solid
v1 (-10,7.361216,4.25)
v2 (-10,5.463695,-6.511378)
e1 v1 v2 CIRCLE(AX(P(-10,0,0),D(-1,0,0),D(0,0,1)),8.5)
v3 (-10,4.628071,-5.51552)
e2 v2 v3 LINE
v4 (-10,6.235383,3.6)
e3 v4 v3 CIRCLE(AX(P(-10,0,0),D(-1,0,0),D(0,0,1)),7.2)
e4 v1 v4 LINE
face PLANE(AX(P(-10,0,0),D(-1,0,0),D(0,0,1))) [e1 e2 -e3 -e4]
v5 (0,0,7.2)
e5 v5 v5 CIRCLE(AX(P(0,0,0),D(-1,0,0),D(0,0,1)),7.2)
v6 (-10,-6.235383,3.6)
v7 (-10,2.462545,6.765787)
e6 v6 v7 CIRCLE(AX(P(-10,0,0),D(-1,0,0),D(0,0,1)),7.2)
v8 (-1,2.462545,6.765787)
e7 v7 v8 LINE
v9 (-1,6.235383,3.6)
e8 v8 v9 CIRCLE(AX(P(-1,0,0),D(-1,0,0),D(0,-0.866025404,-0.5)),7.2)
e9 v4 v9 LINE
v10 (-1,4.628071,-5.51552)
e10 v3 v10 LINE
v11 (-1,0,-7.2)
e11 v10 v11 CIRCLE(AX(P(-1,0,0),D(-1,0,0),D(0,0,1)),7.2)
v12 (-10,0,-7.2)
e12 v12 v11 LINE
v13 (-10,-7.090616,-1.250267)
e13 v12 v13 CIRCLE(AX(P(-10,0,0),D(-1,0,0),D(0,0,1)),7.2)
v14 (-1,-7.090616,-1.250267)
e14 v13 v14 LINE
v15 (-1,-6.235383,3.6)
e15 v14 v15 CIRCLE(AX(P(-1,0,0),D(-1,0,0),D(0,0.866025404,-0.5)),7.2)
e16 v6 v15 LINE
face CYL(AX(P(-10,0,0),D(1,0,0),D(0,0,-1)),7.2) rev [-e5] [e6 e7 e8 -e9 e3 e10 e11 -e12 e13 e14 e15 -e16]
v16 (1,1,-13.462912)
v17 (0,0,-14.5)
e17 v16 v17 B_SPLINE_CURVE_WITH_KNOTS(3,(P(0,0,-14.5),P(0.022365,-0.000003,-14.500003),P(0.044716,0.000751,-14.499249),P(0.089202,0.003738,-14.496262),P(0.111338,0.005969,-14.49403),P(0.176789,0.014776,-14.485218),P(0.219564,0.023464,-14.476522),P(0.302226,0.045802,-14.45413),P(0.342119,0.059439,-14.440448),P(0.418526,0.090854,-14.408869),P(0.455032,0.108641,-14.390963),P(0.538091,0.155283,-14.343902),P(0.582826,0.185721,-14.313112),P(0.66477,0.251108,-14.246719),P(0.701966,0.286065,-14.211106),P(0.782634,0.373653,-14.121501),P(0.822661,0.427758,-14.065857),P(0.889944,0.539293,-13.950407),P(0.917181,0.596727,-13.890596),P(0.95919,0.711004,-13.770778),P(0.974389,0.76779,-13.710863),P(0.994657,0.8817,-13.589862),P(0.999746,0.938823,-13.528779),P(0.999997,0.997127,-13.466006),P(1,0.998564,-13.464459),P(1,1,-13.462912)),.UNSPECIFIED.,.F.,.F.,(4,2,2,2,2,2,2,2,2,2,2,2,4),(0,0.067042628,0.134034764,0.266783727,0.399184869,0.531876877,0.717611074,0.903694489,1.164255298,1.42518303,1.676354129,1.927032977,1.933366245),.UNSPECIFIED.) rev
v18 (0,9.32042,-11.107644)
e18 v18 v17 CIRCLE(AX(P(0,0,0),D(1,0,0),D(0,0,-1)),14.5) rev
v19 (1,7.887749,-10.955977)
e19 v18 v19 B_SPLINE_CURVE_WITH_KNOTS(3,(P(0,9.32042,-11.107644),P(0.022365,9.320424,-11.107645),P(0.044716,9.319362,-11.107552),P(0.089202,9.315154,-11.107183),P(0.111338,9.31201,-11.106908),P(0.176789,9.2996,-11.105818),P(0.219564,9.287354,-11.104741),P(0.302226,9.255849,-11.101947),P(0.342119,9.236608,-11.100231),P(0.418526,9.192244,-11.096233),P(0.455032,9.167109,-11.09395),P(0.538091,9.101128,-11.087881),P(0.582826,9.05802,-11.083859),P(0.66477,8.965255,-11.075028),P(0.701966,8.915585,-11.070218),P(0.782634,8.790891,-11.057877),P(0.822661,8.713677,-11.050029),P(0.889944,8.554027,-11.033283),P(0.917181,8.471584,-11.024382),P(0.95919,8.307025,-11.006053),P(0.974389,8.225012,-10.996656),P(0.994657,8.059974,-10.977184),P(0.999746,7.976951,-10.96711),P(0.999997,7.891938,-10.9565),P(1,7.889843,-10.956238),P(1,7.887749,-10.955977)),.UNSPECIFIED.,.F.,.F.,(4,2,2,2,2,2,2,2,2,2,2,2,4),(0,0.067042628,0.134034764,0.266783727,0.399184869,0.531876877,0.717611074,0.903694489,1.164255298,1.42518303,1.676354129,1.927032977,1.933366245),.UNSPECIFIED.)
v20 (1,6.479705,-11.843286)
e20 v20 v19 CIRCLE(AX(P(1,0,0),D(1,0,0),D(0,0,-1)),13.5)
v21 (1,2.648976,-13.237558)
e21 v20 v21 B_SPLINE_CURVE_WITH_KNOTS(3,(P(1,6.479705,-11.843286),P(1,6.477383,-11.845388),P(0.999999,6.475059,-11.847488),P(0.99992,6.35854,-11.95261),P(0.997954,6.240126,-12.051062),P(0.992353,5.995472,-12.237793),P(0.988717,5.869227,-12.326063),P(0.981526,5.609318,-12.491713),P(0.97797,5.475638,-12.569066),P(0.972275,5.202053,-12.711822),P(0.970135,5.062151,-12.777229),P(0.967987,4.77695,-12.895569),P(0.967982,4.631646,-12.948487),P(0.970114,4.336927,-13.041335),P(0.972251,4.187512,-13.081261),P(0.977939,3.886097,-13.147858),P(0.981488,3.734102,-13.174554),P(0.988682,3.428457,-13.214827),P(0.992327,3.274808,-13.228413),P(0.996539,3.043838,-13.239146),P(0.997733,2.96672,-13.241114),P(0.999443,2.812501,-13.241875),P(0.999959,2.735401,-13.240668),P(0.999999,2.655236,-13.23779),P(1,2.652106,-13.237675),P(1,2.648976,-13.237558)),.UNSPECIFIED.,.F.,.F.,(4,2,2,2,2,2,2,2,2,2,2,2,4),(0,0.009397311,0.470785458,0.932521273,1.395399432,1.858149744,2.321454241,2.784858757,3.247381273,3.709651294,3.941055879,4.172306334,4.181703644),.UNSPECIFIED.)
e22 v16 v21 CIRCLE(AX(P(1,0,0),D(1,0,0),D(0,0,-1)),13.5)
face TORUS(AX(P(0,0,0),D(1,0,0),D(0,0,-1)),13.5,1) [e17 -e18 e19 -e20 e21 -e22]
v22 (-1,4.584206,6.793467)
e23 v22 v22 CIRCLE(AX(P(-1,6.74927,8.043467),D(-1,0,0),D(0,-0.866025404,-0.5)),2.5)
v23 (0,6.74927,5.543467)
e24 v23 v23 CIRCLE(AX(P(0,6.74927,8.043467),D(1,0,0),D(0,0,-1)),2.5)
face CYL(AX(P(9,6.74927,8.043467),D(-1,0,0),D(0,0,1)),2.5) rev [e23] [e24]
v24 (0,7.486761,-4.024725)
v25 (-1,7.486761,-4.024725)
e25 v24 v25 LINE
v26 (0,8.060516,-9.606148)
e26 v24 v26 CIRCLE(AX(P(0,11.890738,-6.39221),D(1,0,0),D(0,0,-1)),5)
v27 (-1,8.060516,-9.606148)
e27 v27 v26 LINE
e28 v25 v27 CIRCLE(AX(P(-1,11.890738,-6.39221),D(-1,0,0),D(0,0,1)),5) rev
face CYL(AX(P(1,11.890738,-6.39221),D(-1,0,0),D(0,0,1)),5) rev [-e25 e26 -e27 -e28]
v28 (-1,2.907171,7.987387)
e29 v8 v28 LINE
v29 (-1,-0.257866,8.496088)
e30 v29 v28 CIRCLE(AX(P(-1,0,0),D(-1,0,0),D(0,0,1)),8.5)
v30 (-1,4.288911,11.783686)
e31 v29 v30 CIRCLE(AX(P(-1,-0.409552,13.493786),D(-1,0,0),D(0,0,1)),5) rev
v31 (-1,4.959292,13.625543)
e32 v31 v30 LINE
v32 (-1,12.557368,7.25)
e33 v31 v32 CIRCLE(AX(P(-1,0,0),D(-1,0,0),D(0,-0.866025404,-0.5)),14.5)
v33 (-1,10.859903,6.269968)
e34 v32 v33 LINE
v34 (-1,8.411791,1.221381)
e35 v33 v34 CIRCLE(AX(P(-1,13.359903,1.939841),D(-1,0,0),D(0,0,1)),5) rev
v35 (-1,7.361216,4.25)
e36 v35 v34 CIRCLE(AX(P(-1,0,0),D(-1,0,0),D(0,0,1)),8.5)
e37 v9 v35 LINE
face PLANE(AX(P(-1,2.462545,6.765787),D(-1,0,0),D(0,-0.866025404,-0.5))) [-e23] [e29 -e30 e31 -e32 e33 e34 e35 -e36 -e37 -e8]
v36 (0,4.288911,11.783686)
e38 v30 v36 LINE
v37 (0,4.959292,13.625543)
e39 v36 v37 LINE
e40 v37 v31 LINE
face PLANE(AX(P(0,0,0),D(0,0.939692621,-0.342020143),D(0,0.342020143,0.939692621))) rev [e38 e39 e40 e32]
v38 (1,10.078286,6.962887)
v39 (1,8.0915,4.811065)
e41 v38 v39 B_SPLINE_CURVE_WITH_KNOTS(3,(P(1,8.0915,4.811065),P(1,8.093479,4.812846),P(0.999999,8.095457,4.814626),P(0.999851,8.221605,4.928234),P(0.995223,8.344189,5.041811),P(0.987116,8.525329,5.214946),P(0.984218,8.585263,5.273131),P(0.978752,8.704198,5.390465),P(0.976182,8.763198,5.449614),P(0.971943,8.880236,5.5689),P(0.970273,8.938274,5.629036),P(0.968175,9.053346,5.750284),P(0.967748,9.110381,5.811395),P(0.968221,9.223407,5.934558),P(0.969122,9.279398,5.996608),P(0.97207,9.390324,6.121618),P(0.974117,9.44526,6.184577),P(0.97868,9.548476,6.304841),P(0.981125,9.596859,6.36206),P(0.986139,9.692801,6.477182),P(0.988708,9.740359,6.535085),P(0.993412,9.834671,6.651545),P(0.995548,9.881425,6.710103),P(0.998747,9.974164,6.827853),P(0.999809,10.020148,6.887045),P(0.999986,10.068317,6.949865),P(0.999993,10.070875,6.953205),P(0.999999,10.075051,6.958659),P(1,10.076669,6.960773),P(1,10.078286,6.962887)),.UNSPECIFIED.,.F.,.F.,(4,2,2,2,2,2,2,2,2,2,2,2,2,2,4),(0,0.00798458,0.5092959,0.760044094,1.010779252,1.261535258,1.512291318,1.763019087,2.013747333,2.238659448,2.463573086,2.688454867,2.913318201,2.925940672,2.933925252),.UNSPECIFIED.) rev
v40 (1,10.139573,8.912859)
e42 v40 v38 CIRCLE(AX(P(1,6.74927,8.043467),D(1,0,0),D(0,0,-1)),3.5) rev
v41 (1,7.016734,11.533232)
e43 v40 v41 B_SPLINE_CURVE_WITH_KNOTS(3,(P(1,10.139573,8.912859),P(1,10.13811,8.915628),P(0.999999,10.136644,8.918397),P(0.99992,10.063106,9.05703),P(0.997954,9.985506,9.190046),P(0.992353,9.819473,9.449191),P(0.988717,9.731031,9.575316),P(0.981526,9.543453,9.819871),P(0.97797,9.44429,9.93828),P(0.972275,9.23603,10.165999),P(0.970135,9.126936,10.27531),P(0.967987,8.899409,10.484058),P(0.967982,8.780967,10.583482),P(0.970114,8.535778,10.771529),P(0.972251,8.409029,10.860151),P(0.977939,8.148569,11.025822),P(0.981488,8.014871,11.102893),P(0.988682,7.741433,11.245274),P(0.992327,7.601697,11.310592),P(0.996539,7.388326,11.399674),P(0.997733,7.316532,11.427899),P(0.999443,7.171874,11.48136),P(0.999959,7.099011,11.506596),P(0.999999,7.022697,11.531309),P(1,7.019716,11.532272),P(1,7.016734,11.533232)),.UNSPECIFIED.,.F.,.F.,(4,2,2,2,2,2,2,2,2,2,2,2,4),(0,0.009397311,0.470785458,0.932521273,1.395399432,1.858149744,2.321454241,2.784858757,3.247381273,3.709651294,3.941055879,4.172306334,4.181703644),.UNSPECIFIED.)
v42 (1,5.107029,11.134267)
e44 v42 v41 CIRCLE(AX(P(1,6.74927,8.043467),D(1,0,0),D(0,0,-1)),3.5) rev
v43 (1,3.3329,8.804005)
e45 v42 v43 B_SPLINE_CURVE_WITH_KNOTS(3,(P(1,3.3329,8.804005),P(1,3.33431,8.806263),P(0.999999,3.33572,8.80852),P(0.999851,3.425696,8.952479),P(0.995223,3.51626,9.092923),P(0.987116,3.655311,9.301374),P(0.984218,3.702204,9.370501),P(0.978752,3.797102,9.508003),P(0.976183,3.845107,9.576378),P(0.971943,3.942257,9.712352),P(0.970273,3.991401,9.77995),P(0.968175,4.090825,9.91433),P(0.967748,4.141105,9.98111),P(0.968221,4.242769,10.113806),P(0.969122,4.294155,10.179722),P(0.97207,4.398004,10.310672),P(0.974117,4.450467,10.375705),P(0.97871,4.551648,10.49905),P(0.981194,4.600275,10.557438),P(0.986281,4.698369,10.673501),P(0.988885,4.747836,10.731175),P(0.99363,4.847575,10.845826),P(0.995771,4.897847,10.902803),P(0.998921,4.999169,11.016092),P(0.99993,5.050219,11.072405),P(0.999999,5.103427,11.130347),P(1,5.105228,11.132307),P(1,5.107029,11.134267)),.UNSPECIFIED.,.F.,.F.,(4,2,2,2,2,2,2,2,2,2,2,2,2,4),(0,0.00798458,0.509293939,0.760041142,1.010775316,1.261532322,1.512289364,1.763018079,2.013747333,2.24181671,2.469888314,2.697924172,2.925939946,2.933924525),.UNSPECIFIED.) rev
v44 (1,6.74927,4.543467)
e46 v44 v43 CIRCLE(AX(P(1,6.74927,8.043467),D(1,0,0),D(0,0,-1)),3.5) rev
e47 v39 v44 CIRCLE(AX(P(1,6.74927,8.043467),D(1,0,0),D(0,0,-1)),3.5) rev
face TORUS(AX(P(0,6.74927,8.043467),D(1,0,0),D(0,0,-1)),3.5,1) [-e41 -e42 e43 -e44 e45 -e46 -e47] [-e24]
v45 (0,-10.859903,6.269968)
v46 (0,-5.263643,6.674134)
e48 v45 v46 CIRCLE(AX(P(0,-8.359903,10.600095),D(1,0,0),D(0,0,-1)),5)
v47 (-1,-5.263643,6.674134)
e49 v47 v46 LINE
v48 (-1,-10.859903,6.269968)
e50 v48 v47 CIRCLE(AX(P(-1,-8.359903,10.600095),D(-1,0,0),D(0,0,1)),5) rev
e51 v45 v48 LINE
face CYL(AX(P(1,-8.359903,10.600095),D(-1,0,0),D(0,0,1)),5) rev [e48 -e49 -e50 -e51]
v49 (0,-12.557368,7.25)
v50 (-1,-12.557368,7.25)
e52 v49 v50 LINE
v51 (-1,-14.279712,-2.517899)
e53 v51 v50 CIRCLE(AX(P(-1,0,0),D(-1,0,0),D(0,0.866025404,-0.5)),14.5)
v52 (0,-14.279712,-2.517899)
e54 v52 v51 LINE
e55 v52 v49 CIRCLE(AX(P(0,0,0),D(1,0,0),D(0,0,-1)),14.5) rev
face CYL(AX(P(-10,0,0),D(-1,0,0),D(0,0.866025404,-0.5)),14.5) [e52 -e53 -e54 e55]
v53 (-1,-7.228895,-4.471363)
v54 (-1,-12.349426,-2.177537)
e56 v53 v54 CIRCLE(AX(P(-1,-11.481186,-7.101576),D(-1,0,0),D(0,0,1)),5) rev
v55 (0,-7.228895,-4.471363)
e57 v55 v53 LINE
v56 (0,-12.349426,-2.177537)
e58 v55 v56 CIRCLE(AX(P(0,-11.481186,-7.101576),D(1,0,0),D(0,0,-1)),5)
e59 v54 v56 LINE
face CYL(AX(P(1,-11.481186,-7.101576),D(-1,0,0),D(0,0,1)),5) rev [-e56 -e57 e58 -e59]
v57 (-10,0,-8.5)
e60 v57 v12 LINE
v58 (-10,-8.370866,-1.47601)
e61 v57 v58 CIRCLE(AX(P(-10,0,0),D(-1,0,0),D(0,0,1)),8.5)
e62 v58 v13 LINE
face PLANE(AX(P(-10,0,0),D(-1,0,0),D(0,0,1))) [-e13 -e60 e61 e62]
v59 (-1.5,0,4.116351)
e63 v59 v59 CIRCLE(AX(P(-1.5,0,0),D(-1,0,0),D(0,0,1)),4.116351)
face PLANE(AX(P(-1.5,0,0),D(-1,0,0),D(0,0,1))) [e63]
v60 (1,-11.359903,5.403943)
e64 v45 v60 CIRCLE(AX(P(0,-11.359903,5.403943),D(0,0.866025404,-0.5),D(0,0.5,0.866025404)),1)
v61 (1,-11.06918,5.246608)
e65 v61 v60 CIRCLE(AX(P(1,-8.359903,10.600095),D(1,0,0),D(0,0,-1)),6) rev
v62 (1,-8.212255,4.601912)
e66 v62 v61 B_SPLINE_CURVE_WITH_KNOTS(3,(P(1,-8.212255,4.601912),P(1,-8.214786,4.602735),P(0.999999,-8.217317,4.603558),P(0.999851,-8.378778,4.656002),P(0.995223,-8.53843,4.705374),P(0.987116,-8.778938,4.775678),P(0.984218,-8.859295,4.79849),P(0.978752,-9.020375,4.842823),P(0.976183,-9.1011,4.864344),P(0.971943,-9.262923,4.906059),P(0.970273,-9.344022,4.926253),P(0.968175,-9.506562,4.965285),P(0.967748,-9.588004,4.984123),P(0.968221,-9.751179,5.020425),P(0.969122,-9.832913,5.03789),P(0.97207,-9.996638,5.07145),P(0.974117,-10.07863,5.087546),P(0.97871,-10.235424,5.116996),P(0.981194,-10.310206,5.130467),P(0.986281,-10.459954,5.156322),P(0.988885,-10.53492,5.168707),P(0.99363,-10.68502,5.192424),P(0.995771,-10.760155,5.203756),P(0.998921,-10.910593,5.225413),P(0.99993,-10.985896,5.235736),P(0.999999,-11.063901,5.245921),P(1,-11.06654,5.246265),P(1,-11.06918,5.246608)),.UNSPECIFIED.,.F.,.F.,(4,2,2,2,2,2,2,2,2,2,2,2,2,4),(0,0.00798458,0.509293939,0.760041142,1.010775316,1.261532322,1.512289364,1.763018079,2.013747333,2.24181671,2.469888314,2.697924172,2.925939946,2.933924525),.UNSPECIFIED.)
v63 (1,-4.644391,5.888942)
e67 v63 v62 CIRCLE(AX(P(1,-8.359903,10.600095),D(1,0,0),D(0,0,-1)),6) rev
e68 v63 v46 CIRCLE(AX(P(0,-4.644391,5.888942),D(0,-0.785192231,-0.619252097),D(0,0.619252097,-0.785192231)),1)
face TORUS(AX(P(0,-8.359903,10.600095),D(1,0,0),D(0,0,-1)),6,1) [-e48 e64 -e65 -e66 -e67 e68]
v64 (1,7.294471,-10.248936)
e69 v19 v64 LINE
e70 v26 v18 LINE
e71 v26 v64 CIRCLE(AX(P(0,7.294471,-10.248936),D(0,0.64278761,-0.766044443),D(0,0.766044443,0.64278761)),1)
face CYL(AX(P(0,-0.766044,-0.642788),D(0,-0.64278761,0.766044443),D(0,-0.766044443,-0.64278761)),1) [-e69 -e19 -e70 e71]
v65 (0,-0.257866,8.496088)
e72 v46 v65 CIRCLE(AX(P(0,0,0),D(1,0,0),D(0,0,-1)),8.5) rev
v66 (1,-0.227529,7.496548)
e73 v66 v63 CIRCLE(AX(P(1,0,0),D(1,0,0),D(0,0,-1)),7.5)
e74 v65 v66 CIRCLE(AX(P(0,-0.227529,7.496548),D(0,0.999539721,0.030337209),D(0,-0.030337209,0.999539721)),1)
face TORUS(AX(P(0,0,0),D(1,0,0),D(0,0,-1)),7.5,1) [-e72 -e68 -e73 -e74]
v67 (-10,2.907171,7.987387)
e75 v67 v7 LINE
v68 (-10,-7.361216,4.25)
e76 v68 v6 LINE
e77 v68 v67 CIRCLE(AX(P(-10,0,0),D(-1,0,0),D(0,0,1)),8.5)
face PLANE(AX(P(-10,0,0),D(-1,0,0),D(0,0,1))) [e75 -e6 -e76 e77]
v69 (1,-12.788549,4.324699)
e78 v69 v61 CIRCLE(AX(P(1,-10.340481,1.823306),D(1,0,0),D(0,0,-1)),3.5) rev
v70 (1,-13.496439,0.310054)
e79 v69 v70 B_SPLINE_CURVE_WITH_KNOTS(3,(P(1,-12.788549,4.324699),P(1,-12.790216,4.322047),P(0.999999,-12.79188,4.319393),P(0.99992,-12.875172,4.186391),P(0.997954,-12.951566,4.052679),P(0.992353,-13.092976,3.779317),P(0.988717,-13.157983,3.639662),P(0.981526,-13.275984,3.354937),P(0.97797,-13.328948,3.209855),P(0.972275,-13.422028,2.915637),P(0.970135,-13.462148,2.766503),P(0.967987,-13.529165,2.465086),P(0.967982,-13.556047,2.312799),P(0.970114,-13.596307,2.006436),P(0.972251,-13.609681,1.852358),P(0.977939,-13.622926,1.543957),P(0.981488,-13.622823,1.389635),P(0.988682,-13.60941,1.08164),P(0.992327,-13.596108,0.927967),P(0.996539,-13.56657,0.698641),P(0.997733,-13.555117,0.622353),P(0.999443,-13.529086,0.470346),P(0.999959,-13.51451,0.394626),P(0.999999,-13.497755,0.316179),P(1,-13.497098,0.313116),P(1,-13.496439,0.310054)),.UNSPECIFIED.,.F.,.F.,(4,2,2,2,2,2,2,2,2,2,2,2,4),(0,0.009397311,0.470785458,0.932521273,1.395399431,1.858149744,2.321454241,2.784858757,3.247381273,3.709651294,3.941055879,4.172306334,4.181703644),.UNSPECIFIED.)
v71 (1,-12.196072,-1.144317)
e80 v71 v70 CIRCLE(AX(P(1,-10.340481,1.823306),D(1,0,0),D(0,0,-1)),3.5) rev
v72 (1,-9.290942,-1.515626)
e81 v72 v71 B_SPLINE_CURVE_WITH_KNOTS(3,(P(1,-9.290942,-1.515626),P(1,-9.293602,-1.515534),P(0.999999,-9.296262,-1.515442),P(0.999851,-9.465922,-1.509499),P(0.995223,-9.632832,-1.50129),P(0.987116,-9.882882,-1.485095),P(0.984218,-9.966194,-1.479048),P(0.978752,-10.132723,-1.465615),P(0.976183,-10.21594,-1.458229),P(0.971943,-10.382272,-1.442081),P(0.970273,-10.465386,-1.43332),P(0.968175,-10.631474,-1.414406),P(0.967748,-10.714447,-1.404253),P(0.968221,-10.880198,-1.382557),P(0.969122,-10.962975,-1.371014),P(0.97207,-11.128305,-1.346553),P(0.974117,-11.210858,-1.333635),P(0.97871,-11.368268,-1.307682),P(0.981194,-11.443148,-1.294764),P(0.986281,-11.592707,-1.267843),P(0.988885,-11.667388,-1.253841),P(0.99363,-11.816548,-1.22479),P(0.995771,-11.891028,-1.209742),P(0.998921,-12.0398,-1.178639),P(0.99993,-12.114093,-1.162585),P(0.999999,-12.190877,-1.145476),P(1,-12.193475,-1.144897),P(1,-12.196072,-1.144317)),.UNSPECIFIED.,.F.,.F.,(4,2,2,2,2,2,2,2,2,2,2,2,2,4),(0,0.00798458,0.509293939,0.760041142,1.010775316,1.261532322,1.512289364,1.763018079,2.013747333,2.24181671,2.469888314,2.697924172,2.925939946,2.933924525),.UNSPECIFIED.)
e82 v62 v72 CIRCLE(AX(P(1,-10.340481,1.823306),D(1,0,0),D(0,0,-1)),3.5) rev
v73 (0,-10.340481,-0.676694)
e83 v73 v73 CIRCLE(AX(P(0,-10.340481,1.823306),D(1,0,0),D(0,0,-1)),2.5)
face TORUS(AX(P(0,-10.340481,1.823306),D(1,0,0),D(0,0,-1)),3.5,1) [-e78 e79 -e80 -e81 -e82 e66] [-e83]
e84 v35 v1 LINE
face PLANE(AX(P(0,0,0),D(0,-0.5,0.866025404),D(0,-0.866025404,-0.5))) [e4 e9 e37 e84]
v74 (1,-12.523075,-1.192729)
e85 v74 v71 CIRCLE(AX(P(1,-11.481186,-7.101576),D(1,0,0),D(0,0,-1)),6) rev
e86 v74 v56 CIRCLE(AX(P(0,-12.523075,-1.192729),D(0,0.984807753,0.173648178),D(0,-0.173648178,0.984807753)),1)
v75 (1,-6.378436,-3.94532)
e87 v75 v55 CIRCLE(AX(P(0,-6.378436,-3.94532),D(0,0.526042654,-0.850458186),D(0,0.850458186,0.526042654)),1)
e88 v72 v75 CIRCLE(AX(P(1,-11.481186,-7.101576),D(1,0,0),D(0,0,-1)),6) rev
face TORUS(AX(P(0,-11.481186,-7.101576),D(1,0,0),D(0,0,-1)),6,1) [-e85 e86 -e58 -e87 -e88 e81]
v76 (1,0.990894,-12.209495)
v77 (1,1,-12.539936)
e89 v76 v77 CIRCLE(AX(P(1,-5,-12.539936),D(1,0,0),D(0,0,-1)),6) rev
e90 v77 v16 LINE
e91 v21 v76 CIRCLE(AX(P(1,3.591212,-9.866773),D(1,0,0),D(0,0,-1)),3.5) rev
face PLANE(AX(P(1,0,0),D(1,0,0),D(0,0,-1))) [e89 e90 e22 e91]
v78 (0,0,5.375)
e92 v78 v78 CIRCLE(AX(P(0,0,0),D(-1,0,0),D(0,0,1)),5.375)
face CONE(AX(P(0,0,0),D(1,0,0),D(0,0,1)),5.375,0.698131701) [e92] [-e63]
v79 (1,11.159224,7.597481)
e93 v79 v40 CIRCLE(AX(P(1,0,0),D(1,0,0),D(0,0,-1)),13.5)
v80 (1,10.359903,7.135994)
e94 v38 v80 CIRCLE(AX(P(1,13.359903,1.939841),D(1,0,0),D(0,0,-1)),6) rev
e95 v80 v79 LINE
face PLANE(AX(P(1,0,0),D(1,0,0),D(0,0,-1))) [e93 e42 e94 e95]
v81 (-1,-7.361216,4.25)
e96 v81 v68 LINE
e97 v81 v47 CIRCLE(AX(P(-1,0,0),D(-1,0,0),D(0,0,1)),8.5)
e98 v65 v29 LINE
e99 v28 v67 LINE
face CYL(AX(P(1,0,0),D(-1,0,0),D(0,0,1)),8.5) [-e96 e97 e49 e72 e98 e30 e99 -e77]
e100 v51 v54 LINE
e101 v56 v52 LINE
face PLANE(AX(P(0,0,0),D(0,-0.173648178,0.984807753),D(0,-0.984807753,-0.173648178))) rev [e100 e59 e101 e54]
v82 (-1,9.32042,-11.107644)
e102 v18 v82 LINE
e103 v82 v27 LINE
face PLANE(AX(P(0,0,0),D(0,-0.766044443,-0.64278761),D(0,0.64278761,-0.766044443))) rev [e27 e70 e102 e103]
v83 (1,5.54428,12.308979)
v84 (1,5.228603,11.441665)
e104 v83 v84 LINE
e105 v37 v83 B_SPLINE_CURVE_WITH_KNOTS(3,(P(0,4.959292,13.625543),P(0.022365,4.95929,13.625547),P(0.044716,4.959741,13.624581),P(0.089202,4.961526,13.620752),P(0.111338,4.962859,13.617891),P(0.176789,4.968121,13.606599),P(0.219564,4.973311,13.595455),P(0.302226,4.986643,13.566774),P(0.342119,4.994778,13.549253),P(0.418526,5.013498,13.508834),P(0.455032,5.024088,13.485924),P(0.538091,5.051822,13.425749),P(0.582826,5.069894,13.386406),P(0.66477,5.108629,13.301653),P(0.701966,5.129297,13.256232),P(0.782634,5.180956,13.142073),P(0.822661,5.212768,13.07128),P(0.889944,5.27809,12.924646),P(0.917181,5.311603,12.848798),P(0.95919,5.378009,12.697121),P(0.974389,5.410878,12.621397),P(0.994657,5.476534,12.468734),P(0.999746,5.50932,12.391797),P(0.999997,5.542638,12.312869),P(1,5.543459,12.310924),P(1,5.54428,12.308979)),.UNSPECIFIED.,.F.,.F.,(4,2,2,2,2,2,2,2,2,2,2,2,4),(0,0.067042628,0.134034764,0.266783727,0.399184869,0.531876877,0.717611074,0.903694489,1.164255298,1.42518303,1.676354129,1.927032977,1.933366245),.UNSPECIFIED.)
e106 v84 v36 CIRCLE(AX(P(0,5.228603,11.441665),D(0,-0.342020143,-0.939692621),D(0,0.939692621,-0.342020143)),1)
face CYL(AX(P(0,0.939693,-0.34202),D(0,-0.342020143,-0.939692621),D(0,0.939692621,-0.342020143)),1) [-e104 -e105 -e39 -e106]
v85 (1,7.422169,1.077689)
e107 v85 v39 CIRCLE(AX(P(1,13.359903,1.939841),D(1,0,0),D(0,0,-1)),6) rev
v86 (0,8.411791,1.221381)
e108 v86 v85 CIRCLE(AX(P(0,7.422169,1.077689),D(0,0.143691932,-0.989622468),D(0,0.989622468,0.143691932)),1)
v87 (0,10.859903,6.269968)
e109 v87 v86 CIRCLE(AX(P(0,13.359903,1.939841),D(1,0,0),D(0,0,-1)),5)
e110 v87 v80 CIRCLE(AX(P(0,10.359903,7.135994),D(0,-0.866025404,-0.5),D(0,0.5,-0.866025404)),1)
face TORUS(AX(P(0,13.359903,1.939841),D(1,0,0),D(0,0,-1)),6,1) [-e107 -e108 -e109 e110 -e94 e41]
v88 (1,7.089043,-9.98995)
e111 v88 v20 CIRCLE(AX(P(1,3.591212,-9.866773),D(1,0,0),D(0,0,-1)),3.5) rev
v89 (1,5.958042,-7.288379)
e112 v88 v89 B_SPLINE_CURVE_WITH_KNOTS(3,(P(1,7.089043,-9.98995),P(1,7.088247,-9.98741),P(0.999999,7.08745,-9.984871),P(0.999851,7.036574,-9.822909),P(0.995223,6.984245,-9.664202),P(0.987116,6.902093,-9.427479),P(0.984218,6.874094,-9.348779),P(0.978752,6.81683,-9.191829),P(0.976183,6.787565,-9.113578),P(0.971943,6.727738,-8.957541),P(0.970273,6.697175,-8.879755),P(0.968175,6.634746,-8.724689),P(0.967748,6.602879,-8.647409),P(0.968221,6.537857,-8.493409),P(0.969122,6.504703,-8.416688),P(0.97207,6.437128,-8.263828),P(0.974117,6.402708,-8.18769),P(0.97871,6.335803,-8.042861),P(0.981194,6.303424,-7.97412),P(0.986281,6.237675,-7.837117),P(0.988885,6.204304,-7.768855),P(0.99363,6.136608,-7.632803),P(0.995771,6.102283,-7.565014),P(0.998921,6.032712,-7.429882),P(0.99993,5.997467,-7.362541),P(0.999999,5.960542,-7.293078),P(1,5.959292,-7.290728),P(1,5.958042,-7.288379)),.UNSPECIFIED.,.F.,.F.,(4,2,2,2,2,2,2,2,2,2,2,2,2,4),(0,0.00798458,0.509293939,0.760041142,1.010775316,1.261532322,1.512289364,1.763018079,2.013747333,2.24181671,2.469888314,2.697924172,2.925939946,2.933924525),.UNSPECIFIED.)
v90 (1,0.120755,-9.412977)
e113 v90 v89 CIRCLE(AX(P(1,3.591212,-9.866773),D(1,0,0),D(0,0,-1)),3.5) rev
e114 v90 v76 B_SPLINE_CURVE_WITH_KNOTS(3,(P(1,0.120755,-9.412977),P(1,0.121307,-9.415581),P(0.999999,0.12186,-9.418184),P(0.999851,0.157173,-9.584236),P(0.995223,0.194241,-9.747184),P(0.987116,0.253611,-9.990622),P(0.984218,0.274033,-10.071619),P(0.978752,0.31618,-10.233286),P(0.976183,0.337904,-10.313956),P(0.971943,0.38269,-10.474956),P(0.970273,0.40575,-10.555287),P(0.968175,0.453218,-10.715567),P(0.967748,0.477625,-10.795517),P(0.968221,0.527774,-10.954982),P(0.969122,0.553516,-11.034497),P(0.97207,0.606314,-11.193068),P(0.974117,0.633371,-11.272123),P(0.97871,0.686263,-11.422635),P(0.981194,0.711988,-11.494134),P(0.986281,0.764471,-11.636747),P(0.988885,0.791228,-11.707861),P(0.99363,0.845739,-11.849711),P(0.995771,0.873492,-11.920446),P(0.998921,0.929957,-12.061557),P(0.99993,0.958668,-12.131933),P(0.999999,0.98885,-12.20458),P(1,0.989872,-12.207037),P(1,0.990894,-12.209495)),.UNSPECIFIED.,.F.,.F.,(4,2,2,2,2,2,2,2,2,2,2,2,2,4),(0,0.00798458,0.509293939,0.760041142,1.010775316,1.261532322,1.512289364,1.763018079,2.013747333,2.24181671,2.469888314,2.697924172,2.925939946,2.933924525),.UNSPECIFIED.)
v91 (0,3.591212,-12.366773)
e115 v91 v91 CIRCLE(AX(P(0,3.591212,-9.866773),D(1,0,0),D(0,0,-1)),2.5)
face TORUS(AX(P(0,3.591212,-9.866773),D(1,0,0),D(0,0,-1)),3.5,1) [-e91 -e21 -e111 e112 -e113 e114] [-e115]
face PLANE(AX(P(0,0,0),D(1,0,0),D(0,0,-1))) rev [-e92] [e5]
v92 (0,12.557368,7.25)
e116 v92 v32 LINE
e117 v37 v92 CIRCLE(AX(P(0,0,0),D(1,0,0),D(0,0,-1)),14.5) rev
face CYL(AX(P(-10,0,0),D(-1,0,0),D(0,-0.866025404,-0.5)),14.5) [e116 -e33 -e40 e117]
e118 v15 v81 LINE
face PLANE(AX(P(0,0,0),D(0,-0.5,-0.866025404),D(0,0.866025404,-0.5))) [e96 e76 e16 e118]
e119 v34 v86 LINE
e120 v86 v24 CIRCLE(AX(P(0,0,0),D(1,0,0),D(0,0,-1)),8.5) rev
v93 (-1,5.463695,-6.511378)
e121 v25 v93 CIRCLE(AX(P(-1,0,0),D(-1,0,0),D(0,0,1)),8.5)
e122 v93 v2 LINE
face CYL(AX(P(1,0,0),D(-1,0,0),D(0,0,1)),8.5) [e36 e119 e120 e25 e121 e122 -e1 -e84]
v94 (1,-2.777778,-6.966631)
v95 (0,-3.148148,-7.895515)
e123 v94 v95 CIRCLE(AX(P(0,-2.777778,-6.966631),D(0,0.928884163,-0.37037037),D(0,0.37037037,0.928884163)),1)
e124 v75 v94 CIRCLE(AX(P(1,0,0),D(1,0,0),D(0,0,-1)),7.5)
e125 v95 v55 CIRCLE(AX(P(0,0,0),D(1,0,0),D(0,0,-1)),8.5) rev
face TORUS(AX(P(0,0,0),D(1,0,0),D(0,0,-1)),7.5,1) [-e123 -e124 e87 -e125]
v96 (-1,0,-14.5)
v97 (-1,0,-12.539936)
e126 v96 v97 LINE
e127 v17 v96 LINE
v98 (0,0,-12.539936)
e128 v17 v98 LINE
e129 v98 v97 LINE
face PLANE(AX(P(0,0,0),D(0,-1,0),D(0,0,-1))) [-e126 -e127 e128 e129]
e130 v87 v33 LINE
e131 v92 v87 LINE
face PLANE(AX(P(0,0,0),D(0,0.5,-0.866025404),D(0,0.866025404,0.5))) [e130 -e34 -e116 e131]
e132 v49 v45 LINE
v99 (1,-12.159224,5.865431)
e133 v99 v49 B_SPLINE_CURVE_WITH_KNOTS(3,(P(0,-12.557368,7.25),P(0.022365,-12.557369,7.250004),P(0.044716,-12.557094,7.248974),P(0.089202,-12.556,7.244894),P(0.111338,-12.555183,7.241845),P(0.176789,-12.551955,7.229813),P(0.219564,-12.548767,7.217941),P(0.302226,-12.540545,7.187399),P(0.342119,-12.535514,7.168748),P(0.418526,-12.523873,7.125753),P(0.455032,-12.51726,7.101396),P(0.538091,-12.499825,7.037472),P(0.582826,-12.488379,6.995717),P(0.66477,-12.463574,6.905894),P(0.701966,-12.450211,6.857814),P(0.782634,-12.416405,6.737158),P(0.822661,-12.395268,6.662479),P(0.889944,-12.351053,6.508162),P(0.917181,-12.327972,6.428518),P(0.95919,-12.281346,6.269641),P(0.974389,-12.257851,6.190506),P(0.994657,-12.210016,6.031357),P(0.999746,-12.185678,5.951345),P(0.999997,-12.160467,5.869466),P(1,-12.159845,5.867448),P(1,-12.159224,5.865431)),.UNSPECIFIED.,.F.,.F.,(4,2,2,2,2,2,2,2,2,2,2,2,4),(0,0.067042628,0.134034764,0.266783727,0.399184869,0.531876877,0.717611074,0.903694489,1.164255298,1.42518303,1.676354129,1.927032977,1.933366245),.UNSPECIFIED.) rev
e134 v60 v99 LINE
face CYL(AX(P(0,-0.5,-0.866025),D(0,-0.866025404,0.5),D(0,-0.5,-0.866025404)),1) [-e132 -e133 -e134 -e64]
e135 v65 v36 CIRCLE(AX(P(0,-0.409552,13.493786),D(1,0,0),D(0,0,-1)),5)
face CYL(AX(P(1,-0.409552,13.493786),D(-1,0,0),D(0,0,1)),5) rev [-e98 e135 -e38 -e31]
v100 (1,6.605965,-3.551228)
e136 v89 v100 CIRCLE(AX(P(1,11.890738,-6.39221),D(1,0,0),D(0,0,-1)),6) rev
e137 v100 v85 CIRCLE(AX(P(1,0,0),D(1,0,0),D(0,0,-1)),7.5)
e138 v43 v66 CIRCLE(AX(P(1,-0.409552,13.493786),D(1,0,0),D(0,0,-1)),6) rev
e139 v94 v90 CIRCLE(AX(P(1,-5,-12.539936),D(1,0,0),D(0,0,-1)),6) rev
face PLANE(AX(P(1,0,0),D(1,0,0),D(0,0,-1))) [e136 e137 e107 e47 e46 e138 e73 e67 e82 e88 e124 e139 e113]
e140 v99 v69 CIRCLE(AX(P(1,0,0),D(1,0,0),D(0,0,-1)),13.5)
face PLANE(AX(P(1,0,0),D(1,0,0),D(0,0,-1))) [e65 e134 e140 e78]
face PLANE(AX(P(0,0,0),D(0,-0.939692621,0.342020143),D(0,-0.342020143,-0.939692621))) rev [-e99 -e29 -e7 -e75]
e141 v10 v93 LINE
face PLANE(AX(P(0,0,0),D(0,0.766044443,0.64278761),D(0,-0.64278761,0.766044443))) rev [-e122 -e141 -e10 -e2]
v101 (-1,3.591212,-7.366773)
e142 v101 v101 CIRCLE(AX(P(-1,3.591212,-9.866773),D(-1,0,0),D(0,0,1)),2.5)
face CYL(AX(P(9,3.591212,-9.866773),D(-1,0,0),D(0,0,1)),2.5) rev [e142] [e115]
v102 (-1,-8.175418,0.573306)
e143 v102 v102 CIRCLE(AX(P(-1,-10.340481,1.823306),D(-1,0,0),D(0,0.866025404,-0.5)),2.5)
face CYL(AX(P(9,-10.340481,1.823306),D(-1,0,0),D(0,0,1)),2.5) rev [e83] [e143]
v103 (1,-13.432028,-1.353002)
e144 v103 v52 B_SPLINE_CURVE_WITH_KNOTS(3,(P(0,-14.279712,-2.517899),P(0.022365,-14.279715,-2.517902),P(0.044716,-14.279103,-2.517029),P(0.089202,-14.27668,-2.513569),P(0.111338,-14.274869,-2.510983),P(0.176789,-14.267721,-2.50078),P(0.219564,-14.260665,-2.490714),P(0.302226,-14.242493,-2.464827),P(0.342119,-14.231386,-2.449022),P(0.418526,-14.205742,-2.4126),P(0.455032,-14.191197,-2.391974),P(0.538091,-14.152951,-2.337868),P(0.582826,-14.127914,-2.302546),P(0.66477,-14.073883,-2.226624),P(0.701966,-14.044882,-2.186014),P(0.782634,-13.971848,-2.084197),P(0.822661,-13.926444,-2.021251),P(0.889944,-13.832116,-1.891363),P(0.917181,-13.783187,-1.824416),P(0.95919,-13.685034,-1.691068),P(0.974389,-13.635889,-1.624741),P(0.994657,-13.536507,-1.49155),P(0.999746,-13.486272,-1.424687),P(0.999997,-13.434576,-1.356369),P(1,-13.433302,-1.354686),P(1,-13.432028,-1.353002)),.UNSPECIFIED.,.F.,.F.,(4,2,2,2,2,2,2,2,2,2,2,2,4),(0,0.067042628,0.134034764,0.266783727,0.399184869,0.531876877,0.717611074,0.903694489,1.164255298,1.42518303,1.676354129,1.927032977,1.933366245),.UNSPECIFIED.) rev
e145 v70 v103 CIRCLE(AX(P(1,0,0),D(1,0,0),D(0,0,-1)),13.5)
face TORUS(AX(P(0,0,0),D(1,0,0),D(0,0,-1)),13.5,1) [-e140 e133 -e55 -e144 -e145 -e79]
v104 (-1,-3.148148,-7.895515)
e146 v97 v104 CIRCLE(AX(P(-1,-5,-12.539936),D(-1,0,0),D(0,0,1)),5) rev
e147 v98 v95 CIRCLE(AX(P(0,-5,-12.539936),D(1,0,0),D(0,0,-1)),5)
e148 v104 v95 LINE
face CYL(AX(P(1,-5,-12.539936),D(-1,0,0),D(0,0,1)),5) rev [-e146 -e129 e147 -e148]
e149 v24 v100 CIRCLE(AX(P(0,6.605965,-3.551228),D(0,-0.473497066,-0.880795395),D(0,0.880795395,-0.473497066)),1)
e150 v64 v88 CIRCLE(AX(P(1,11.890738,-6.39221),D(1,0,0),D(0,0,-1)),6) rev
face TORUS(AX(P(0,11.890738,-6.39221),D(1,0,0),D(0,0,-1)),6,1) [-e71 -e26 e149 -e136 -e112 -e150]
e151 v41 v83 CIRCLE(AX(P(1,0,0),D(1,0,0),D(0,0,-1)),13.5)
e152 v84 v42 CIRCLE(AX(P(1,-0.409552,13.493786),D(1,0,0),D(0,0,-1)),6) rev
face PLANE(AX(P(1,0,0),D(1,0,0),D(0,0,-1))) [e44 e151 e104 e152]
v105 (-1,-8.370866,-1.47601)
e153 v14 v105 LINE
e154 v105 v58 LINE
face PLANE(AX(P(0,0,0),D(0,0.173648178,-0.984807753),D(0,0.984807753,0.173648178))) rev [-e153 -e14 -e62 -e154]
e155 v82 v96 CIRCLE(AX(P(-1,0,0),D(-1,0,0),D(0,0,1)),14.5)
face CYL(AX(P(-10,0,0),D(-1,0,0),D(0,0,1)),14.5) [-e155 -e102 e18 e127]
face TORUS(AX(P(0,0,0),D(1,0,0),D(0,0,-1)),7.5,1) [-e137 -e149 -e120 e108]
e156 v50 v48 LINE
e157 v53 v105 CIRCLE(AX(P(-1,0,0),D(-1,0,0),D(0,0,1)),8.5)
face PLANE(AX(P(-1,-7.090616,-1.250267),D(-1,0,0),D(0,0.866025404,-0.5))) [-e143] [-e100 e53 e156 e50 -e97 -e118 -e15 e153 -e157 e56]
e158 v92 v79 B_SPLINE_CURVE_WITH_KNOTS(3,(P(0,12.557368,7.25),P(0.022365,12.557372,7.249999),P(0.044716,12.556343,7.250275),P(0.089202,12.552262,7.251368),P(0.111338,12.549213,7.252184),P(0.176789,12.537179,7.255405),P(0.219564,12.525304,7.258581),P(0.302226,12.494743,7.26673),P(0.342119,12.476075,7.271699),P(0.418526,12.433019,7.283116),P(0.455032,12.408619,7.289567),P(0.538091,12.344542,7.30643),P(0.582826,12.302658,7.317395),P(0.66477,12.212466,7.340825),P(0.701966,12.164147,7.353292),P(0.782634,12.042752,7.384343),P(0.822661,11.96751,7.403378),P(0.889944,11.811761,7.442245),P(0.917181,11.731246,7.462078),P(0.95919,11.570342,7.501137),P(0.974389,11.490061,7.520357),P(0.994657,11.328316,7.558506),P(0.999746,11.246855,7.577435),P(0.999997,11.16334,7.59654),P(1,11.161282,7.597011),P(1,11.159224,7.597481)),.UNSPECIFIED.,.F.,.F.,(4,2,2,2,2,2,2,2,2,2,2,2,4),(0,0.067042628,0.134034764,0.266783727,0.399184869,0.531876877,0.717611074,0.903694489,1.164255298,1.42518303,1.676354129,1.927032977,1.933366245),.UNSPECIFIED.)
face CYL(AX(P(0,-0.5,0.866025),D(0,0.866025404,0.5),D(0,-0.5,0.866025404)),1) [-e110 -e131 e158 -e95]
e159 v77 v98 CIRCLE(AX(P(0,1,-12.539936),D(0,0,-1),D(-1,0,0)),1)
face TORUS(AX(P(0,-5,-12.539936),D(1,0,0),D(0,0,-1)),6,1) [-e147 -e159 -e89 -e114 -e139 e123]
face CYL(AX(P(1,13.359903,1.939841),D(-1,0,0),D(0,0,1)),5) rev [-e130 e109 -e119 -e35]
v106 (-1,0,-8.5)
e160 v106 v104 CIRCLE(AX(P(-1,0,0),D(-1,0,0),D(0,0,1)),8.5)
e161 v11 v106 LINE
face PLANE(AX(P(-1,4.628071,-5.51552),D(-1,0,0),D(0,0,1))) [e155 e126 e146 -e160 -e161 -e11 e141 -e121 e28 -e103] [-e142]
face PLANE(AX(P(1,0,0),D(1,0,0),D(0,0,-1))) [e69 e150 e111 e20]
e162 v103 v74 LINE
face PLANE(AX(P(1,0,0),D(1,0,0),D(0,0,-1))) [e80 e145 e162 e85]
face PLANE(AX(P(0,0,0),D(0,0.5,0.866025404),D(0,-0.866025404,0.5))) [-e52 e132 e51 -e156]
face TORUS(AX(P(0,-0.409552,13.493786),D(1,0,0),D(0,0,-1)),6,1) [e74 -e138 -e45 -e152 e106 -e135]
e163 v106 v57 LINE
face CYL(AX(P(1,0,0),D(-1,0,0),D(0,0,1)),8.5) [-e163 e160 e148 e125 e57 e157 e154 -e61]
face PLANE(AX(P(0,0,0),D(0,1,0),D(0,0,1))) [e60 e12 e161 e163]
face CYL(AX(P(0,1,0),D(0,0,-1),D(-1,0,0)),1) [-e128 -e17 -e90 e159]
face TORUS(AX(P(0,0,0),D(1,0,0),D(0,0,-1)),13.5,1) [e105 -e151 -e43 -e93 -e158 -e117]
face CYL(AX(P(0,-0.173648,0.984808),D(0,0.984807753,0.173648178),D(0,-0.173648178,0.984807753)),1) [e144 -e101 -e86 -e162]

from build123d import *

# Parameters (mm, degrees)
SKETCH1_R           = 8.5
BOSS_EXTRUDE1_DEPTH = 1
SKETCH2_R           = 5.375
BOSS_EXTRUDE2_DEPTH = 1.5
BOSS_EXTRUDE2_TAPER = 40.000000000000085
BOSS_EXTRUDE3_START = 10
SKETCH3_R           = 8.5
SKETCH3_R_2         = 7.200000000000001
BOSS_EXTRUDE3_DEPTH = 10
CUT_REVOLVE1_ANGLE  = 40.000000000000085
CIRPATTERN1_COUNT   = 3
REVOLVE1_ANGLE      = 40.000000000000085
SKETCH9_R           = 2.5000000000000004
CUT_EXTRUDE1_DEPTH  = 10
CIRPATTERN3_COUNT   = 3
FILLET3_R           = 5
FILLET4_R           = 1


with BuildPart() as part:
    # Sketch1 → Boss-Extrude1 (new body)
    with BuildSketch(Plane(origin=(0, 0, 0), x_dir=(0, 0, -1), z_dir=(1, 0, 0))):
        Circle(SKETCH1_R)
    extrude(amount=BOSS_EXTRUDE1_DEPTH)

    # Sketch2 → Boss-Extrude2 (add)
    with BuildSketch(Plane.ZY):
        Circle(SKETCH2_R)
    extrude(amount=BOSS_EXTRUDE2_DEPTH, taper=BOSS_EXTRUDE2_TAPER)

    # Sketch3 → Boss-Extrude3 (add)
    with BuildSketch(Plane.ZY.offset(BOSS_EXTRUDE3_START)):
        Circle(SKETCH3_R)
        Circle(SKETCH3_R_2, mode=Mode.SUBTRACT)
    extrude(amount=-BOSS_EXTRUDE3_DEPTH)

    # Sketch6 → Cut-Revolve1 (revolve, cut)
    with BuildSketch(Plane(origin=(0, 0, 0), x_dir=(1, 0, 0), z_dir=(0, 1, 0))):
        Polygon((-9.999999999999998, 8.5), (-10, 7.200000000000001), (-0.9999999999999991, 7.200000000000001), (-0.9999999999999991, 8.5), align=None)
    cut_revolve1 = revolve(axis=Axis((-10, 0, 0), (1, 0, 0)), revolution_arc=CUT_REVOLVE1_ANGLE, mode=Mode.SUBTRACT)

    # CirPattern1: Cut-Revolve1 ×3 about axis
    cirpattern1_axis = Axis((0, 0, 0), (1, 0, 0))
    for i in range(1, CIRPATTERN1_COUNT):
        add(cut_revolve1.rotate(cirpattern1_axis, i * 360 / CIRPATTERN1_COUNT), mode=Mode.SUBTRACT)

    # Sketch8 → Revolve1 (revolve)
    with BuildSketch(Plane(origin=(0, 0, 0), x_dir=(1, 0, 0), z_dir=(0, 1, 0))):
        Polygon((-0.9999999999999996, 8.5), (1, 8.5), (0.9999999999999996, 14.5), (-0.9999999999999996, 14.5), align=None)
    revolve1 = revolve(axis=Axis((-10, 0, 0), (1, 0, 0)), revolution_arc=REVOLVE1_ANGLE)

    # Sketch9 → Cut-Extrude1 (cut)
    with BuildSketch(Plane.ZY.offset(0.9999999999999991)):
        with Locations((-9.866772518252038, 3.5912115049195292)):
            Circle(SKETCH9_R)
    cut_extrude1 = extrude(amount=-CUT_EXTRUDE1_DEPTH, mode=Mode.SUBTRACT)

    # CirPattern3: Revolve1, Cut-Extrude1 ×3 about axis
    cirpattern3_axis = Axis((0, -1.1e-16, 1.8e-16), (1, 0, 0))
    add([revolve1.rotate(cirpattern3_axis, i * 360 / CIRPATTERN3_COUNT) for i in range(1, CIRPATTERN3_COUNT)])
    add([cut_extrude1.rotate(cirpattern3_axis, i * 360 / CIRPATTERN3_COUNT) for i in range(1, CIRPATTERN3_COUNT)], mode=Mode.SUBTRACT)

    # Fillet3
    fillet3_edges = [part.edges().sort_by_distance(p)[0] for p in [
        (4.4e-16, 0, -8.5),
        (4.4e-16, 5.463694682335594, -6.511377766511305),
        (2.2e-16, -7.361215932167726, 4.2500000000000036),
        (2.2e-16, -8.370865900603766, -1.4760095101689152),
        (2.2e-16, 7.361215932167729, 4.249999999999998),
        (2.2e-16, 2.907171218268174, 7.987387276680224),
    ]]
    fillet(fillet3_edges, radius=FILLET3_R)

    # Fillet4
    # the kernel refuses this fillet: 1 mm, written as the material it takes off along each edge
    with BuildSketch(Plane(origin=(1, -10.340481406628186, 1.8233058655027679), x_dir=(0, 0.8660254037844382, -0.5000000000000006), z_dir=(0, 0.5000000000000006, 0.8660254037844382))) as fillet4_piece_1:
        with BuildLine():
            CenterArc((2.4999999999999996 + FILLET4_R, FILLET4_R), FILLET4_R, 180, 90)
            Line((2.4999999999999996, FILLET4_R), (2.4999999999999996, 0))
            Line((2.4999999999999996, 0), (2.4999999999999996 + FILLET4_R, 0))
        make_face()
    revolve(axis=Axis((1, -10.340481406628186, 1.8233058655027679), (-1, 0, 0)), mode=Mode.SUBTRACT)
    with BuildSketch(Plane(origin=(1, 6.74926990170866, 8.043466652749274), x_dir=(0, -0.8660254037844387, -0.4999999999999999), z_dir=(0, 0.4999999999999999, -0.8660254037844387))) as fillet4_piece_2:
        with BuildLine():
            CenterArc((2.5000000000000004 + FILLET4_R, FILLET4_R), FILLET4_R, 180, 90)
            Line((2.5000000000000004, FILLET4_R), (2.5000000000000004, 0))
            Line((2.5000000000000004, 0), (2.5000000000000004 + FILLET4_R, 0))
        make_face()
    revolve(axis=Axis((1, 6.74926990170866, 8.043466652749274), (-1, 0, 0)), mode=Mode.SUBTRACT)
    with BuildSketch(Plane(origin=(1, 0, 0), x_dir=(0, -0.030337209344300137, 0.9995397209361918), z_dir=(0, 0.9995397209361918, 0.030337209344300137))) as fillet4_piece_3:
        with BuildLine():
            CenterArc((8.5 - FILLET4_R, -FILLET4_R), FILLET4_R, 6.36e-15, 90)
            Line((8.5, -FILLET4_R), (8.5, 0))
            Line((8.5, 0), (8.5 - FILLET4_R, 0))
        make_face()
    revolve(axis=Axis((1, 0, 0), (1, 0, 0)), revolution_arc=36.52307841695891, mode=Mode.SUBTRACT)
    with BuildSketch(Plane(origin=(0.9999999999999997, -10.859903314486736, 6.269968101992234), x_dir=(0, -0.5000000000000006, -0.8660254037844385), z_dir=(0, -0.8660254037844384, 0.5000000000000004))) as fillet4_piece_4:
        with BuildLine():
            CenterArc((FILLET4_R, -FILLET4_R), FILLET4_R, 89.99999999999999, 90.00000000000001)
            Line((-3.3e-16, -FILLET4_R), (0, 0))
            Line((0, 0), (FILLET4_R, 0))
        make_face()
    extrude(amount=4.460063796015542, mode=Mode.SUBTRACT)
    with BuildSketch(Plane(origin=(0.9999999999999997, -12.349426395962368, -2.1775370698814775), x_dir=(0, -0.17364817766693136, 0.9848077530122079), z_dir=(0, -0.9848077530122079, -0.17364817766693136))) as fillet4_piece_5:
        with BuildLine():
            CenterArc((FILLET4_R, FILLET4_R), FILLET4_R, 180, 90)
            Line((-4.6e-16, FILLET4_R), (0, 0))
            Line((0, 0), (FILLET4_R, 0))
        make_face()
    extrude(amount=4.460063796015541, mode=Mode.SUBTRACT)
    with BuildSketch(Plane(origin=(1, 0, 0), x_dir=(0, -0.8504581857502006, -0.5260426544401863), z_dir=(0, -0.5260426544401863, 0.8504581857502006))) as fillet4_piece_6:
        with BuildLine():
            CenterArc((8.5 - FILLET4_R, -FILLET4_R), FILLET4_R, 0, 90)
            Line((8.5 - FILLET4_R, 0), (8.5, 0))
            Line((8.5, 0), (8.5, -FILLET4_R))
        make_face()
    revolve(axis=Axis((1, 0, 0), (1, 0, 0)), revolution_arc=36.52307841695894, mode=Mode.SUBTRACT)
    with BuildSketch(Plane(origin=(0.9999999999999997, 0, -12.539936203984453), x_dir=(3.3e-16, 1, 0), z_dir=(-7e-17, 0, -1))) as fillet4_piece_7:
        with BuildLine():
            CenterArc((FILLET4_R, -FILLET4_R), FILLET4_R, 89.99999999999999, 90.00000000000001)
            Line((-4.4e-16, -FILLET4_R), (0, 0))
            Line((0, 0), (FILLET4_R, 0))
        make_face()
    extrude(amount=4.460063796015547, mode=Mode.SUBTRACT)
    with BuildSketch(Plane(origin=(0.9999999999999997, 8.060515618180878, -9.60614844612877), x_dir=(0, -0.7660444431189771, -0.6427876096865406), z_dir=(0, 0.6427876096865406, -0.7660444431189771))) as fillet4_piece_8:
        with BuildLine():
            CenterArc((FILLET4_R, FILLET4_R), FILLET4_R, 180, 90)
            Line((-1.69e-15, FILLET4_R), (0, 0))
            Line((0, 0), (FILLET4_R, 0))
        make_face()
    extrude(amount=4.460063796015548, mode=Mode.SUBTRACT)
    with BuildSketch(Plane(origin=(1, 0, 0), x_dir=(0, 0.8807953950945009, -0.47349706649600487), z_dir=(0, -0.47349706649600487, -0.8807953950945009))) as fillet4_piece_9:
        with BuildLine():
            CenterArc((8.5 - FILLET4_R, -FILLET4_R), FILLET4_R, 6.36e-15, 90)
            Line((8.5, -FILLET4_R), (8.5, 0))
            Line((8.5, 0), (8.5 - FILLET4_R, 0))
        make_face()
    revolve(axis=Axis((1, 0, 0), (1, 0, 0)), revolution_arc=36.523078416958924, mode=Mode.SUBTRACT)
    with BuildSketch(Plane(origin=(0.9999999999999997, 4.28891077778149, 11.783685516010252), x_dir=(0, 0.9396926207859089, -0.3420201433256675), z_dir=(0, 0.3420201433256675, 0.9396926207859089))) as fillet4_piece_10:
        with BuildLine():
            CenterArc((FILLET4_R, FILLET4_R), FILLET4_R, 180, 90)
            Line((-3.3e-16, FILLET4_R), (0, 0))
            Line((0, 0), (FILLET4_R, 0))
        make_face()
    extrude(amount=4.460063796015548, mode=Mode.SUBTRACT)
    with BuildSketch(Plane(origin=(0.9999999999999997, 10.85990331448674, 6.269968101992225), x_dir=(0, -0.4999999999999998, 0.8660254037844388), z_dir=(0, 0.8660254037844388, 0.49999999999999983))) as fillet4_piece_11:
        with BuildLine():
            CenterArc((FILLET4_R, -FILLET4_R), FILLET4_R, 89.99999999999999, 90.00000000000001)
            Line((-3.3e-16, -FILLET4_R), (0, 0))
            Line((0, 0), (FILLET4_R, 0))
        make_face()
    extrude(amount=4.460063796015545, mode=Mode.SUBTRACT)
    with BuildSketch(Plane(origin=(1, -8.359903314486731, 10.600095120914425), x_dir=(0, 0.6192520973693878, -0.785192231178846), z_dir=(0, 0.785192231178846, 0.6192520973693878))) as fillet4_piece_12:
        with BuildLine():
            CenterArc((5 + FILLET4_R, FILLET4_R), FILLET4_R, 180, 90)
            Line((5.000000000000001, FILLET4_R), (5, 0))
            Line((5, 0), (5 + FILLET4_R, 0))
        make_face()
    revolve(axis=Axis((1, -8.359903314486731, 10.600095120914425), (-1, 0, 0)), revolution_arc=68.26153920847956, mode=Mode.SUBTRACT)
    with BuildSketch(Plane(origin=(1, -11.481185507627709, -7.101575834942517), x_dir=(0, 0.8504581857502005, 0.5260426544401863), z_dir=(0, 0.5260426544401863, -0.8504581857502005))) as fillet4_piece_13:
        with BuildLine():
            CenterArc((4.999999999999999 + FILLET4_R, -FILLET4_R), FILLET4_R, 90, 90)
            Line((4.999999999999999, -FILLET4_R), (4.999999999999999, 0))
            Line((4.999999999999999, 0), (4.999999999999999 + FILLET4_R, 0))
        make_face()
    revolve(axis=Axis((1, -11.481185507627709, -7.101575834942517), (1, 0, 0)), revolution_arc=68.26153920847953, mode=Mode.SUBTRACT)
    with BuildSketch(Plane(origin=(1, -5, -12.539936203984453), x_dir=(0, 0.3703703703703699, 0.9288841632581077), z_dir=(0, -0.9288841632581077, 0.3703703703703699))) as fillet4_piece_14:
        with BuildLine():
            CenterArc((4.999999999999999 + FILLET4_R, FILLET4_R), FILLET4_R, 180, 90)
            Line((4.999999999999999, FILLET4_R), (4.999999999999999, 0))
            Line((4.999999999999999, 0), (4.999999999999999 + FILLET4_R, 0))
        make_face()
    revolve(axis=Axis((1, -5, -12.539936203984453), (-1, 0, 0)), revolution_arc=68.26153920847953, mode=Mode.SUBTRACT)
    with BuildSketch(Plane(origin=(1, 11.890737833775763, -6.392210397696068), x_dir=(0, -0.8807953950945008, 0.4734970664960053), z_dir=(0, 0.4734970664960053, 0.8807953950945008))) as fillet4_piece_15:
        with BuildLine():
            CenterArc((5 + FILLET4_R, -FILLET4_R), FILLET4_R, 90, 90)
            Line((5, -FILLET4_R), (5, 0))
            Line((5, 0), (5 + FILLET4_R, 0))
        make_face()
    revolve(axis=Axis((1, 11.890737833775763, -6.392210397696068), (1, 0, 0)), revolution_arc=68.26153920847949, mode=Mode.SUBTRACT)
    with BuildSketch(Plane(origin=(1, -0.4095523261480558, 13.49378623263859), x_dir=(0, 0.9396926207859089, -0.34202014332566755), z_dir=(0, 0.34202014332566755, 0.9396926207859089))) as fillet4_piece_16:
        with BuildLine():
            CenterArc((5.000000000000001 + FILLET4_R, FILLET4_R), FILLET4_R, 180, 90)
            Line((5.000000000000001, FILLET4_R), (5.000000000000001, 0))
            Line((5.000000000000001, 0), (5.000000000000001 + FILLET4_R, 0))
        make_face()
    revolve(axis=Axis((1, -0.4095523261480558, 13.49378623263859), (-1, 0, 0)), revolution_arc=68.26153920847946, mode=Mode.SUBTRACT)
    with BuildSketch(Plane(origin=(1, 13.35990331448674, 1.9398410830700303), x_dir=(0, -0.9896224677397581, -0.14369193207926176), z_dir=(0, 0.14369193207926176, -0.9896224677397581))) as fillet4_piece_17:
        with BuildLine():
            CenterArc((5 + FILLET4_R, FILLET4_R), FILLET4_R, 180, 90)
            Line((5, FILLET4_R), (5, 0))
            Line((5, 0), (5 + FILLET4_R, 0))
        make_face()
    revolve(axis=Axis((1, 13.35990331448674, 1.9398410830700303), (-1, 0, 0)), revolution_arc=68.26153920847953, mode=Mode.SUBTRACT)
    with BuildSketch(Plane(origin=(1, 0, 0), x_dir=(0, -0.17157432670393416, -0.9851711782305101), z_dir=(0, -0.9851711782305101, 0.17157432670393416))) as fillet4_piece_18:
        with BuildLine():
            CenterArc((14.5 - FILLET4_R, -FILLET4_R), FILLET4_R, 6.36e-15, 90)
            Line((14.5, -FILLET4_R), (14.5, 0))
            Line((14.5, 0), (14.5 - FILLET4_R, 0))
        make_face()
    revolve(axis=Axis((1, 0, 0), (1, 0, 0)), revolution_arc=59.75873272198037, mode=Mode.SUBTRACT)
    with BuildSketch(Plane(origin=(1, 3.5912115049195292, -9.866772518252038), x_dir=(0, 0, 1), z_dir=(0, -1, 0))) as fillet4_piece_19:
        with BuildLine():
            CenterArc((2.5 + FILLET4_R, FILLET4_R), FILLET4_R, 180, 90)
            Line((2.5, FILLET4_R), (2.5, 0))
            Line((2.5, 0), (2.5 + FILLET4_R, 0))
        make_face()
    revolve(axis=Axis((1, 3.5912115049195292, -9.866772518252038), (-1, 0, 0)), mode=Mode.SUBTRACT)
    with BuildSketch(Plane(origin=(1, -3.2e-16, 1.8e-16), x_dir=(0, -0.7673961040719015, 0.6411733146780733), z_dir=(0, 0.6411733146780733, 0.7673961040719015))) as fillet4_piece_20:
        with BuildLine():
            CenterArc((14.500000000000002 - FILLET4_R, -FILLET4_R), FILLET4_R, 1.272e-14, 90)
            Line((14.500000000000002, -FILLET4_R), (14.500000000000002, 0))
            Line((14.500000000000002, 0), (14.500000000000002 - FILLET4_R, 0))
        make_face()
    revolve(axis=Axis((1, -3.2e-16, 1.8e-16), (1, 0, 0)), revolution_arc=59.75873272198037, mode=Mode.SUBTRACT)
    with BuildSketch(Plane(origin=(1, 0, 3.7e-16), x_dir=(0, 0.938970430775836, 0.3439978635524371), z_dir=(0, 0.3439978635524371, -0.938970430775836))) as fillet4_piece_21:
        with BuildLine():
            CenterArc((14.500000000000002 - FILLET4_R, -FILLET4_R), FILLET4_R, 6.36e-15, 90)
            Line((14.500000000000004, -FILLET4_R), (14.500000000000002, 0))
            Line((14.500000000000002, 0), (14.500000000000002 - FILLET4_R, 0))
        make_face()
    revolve(axis=Axis((1, 0, 3.7e-16), (1, 0, 0)), revolution_arc=59.75873272198037, mode=Mode.SUBTRACT)


solid = part.part
